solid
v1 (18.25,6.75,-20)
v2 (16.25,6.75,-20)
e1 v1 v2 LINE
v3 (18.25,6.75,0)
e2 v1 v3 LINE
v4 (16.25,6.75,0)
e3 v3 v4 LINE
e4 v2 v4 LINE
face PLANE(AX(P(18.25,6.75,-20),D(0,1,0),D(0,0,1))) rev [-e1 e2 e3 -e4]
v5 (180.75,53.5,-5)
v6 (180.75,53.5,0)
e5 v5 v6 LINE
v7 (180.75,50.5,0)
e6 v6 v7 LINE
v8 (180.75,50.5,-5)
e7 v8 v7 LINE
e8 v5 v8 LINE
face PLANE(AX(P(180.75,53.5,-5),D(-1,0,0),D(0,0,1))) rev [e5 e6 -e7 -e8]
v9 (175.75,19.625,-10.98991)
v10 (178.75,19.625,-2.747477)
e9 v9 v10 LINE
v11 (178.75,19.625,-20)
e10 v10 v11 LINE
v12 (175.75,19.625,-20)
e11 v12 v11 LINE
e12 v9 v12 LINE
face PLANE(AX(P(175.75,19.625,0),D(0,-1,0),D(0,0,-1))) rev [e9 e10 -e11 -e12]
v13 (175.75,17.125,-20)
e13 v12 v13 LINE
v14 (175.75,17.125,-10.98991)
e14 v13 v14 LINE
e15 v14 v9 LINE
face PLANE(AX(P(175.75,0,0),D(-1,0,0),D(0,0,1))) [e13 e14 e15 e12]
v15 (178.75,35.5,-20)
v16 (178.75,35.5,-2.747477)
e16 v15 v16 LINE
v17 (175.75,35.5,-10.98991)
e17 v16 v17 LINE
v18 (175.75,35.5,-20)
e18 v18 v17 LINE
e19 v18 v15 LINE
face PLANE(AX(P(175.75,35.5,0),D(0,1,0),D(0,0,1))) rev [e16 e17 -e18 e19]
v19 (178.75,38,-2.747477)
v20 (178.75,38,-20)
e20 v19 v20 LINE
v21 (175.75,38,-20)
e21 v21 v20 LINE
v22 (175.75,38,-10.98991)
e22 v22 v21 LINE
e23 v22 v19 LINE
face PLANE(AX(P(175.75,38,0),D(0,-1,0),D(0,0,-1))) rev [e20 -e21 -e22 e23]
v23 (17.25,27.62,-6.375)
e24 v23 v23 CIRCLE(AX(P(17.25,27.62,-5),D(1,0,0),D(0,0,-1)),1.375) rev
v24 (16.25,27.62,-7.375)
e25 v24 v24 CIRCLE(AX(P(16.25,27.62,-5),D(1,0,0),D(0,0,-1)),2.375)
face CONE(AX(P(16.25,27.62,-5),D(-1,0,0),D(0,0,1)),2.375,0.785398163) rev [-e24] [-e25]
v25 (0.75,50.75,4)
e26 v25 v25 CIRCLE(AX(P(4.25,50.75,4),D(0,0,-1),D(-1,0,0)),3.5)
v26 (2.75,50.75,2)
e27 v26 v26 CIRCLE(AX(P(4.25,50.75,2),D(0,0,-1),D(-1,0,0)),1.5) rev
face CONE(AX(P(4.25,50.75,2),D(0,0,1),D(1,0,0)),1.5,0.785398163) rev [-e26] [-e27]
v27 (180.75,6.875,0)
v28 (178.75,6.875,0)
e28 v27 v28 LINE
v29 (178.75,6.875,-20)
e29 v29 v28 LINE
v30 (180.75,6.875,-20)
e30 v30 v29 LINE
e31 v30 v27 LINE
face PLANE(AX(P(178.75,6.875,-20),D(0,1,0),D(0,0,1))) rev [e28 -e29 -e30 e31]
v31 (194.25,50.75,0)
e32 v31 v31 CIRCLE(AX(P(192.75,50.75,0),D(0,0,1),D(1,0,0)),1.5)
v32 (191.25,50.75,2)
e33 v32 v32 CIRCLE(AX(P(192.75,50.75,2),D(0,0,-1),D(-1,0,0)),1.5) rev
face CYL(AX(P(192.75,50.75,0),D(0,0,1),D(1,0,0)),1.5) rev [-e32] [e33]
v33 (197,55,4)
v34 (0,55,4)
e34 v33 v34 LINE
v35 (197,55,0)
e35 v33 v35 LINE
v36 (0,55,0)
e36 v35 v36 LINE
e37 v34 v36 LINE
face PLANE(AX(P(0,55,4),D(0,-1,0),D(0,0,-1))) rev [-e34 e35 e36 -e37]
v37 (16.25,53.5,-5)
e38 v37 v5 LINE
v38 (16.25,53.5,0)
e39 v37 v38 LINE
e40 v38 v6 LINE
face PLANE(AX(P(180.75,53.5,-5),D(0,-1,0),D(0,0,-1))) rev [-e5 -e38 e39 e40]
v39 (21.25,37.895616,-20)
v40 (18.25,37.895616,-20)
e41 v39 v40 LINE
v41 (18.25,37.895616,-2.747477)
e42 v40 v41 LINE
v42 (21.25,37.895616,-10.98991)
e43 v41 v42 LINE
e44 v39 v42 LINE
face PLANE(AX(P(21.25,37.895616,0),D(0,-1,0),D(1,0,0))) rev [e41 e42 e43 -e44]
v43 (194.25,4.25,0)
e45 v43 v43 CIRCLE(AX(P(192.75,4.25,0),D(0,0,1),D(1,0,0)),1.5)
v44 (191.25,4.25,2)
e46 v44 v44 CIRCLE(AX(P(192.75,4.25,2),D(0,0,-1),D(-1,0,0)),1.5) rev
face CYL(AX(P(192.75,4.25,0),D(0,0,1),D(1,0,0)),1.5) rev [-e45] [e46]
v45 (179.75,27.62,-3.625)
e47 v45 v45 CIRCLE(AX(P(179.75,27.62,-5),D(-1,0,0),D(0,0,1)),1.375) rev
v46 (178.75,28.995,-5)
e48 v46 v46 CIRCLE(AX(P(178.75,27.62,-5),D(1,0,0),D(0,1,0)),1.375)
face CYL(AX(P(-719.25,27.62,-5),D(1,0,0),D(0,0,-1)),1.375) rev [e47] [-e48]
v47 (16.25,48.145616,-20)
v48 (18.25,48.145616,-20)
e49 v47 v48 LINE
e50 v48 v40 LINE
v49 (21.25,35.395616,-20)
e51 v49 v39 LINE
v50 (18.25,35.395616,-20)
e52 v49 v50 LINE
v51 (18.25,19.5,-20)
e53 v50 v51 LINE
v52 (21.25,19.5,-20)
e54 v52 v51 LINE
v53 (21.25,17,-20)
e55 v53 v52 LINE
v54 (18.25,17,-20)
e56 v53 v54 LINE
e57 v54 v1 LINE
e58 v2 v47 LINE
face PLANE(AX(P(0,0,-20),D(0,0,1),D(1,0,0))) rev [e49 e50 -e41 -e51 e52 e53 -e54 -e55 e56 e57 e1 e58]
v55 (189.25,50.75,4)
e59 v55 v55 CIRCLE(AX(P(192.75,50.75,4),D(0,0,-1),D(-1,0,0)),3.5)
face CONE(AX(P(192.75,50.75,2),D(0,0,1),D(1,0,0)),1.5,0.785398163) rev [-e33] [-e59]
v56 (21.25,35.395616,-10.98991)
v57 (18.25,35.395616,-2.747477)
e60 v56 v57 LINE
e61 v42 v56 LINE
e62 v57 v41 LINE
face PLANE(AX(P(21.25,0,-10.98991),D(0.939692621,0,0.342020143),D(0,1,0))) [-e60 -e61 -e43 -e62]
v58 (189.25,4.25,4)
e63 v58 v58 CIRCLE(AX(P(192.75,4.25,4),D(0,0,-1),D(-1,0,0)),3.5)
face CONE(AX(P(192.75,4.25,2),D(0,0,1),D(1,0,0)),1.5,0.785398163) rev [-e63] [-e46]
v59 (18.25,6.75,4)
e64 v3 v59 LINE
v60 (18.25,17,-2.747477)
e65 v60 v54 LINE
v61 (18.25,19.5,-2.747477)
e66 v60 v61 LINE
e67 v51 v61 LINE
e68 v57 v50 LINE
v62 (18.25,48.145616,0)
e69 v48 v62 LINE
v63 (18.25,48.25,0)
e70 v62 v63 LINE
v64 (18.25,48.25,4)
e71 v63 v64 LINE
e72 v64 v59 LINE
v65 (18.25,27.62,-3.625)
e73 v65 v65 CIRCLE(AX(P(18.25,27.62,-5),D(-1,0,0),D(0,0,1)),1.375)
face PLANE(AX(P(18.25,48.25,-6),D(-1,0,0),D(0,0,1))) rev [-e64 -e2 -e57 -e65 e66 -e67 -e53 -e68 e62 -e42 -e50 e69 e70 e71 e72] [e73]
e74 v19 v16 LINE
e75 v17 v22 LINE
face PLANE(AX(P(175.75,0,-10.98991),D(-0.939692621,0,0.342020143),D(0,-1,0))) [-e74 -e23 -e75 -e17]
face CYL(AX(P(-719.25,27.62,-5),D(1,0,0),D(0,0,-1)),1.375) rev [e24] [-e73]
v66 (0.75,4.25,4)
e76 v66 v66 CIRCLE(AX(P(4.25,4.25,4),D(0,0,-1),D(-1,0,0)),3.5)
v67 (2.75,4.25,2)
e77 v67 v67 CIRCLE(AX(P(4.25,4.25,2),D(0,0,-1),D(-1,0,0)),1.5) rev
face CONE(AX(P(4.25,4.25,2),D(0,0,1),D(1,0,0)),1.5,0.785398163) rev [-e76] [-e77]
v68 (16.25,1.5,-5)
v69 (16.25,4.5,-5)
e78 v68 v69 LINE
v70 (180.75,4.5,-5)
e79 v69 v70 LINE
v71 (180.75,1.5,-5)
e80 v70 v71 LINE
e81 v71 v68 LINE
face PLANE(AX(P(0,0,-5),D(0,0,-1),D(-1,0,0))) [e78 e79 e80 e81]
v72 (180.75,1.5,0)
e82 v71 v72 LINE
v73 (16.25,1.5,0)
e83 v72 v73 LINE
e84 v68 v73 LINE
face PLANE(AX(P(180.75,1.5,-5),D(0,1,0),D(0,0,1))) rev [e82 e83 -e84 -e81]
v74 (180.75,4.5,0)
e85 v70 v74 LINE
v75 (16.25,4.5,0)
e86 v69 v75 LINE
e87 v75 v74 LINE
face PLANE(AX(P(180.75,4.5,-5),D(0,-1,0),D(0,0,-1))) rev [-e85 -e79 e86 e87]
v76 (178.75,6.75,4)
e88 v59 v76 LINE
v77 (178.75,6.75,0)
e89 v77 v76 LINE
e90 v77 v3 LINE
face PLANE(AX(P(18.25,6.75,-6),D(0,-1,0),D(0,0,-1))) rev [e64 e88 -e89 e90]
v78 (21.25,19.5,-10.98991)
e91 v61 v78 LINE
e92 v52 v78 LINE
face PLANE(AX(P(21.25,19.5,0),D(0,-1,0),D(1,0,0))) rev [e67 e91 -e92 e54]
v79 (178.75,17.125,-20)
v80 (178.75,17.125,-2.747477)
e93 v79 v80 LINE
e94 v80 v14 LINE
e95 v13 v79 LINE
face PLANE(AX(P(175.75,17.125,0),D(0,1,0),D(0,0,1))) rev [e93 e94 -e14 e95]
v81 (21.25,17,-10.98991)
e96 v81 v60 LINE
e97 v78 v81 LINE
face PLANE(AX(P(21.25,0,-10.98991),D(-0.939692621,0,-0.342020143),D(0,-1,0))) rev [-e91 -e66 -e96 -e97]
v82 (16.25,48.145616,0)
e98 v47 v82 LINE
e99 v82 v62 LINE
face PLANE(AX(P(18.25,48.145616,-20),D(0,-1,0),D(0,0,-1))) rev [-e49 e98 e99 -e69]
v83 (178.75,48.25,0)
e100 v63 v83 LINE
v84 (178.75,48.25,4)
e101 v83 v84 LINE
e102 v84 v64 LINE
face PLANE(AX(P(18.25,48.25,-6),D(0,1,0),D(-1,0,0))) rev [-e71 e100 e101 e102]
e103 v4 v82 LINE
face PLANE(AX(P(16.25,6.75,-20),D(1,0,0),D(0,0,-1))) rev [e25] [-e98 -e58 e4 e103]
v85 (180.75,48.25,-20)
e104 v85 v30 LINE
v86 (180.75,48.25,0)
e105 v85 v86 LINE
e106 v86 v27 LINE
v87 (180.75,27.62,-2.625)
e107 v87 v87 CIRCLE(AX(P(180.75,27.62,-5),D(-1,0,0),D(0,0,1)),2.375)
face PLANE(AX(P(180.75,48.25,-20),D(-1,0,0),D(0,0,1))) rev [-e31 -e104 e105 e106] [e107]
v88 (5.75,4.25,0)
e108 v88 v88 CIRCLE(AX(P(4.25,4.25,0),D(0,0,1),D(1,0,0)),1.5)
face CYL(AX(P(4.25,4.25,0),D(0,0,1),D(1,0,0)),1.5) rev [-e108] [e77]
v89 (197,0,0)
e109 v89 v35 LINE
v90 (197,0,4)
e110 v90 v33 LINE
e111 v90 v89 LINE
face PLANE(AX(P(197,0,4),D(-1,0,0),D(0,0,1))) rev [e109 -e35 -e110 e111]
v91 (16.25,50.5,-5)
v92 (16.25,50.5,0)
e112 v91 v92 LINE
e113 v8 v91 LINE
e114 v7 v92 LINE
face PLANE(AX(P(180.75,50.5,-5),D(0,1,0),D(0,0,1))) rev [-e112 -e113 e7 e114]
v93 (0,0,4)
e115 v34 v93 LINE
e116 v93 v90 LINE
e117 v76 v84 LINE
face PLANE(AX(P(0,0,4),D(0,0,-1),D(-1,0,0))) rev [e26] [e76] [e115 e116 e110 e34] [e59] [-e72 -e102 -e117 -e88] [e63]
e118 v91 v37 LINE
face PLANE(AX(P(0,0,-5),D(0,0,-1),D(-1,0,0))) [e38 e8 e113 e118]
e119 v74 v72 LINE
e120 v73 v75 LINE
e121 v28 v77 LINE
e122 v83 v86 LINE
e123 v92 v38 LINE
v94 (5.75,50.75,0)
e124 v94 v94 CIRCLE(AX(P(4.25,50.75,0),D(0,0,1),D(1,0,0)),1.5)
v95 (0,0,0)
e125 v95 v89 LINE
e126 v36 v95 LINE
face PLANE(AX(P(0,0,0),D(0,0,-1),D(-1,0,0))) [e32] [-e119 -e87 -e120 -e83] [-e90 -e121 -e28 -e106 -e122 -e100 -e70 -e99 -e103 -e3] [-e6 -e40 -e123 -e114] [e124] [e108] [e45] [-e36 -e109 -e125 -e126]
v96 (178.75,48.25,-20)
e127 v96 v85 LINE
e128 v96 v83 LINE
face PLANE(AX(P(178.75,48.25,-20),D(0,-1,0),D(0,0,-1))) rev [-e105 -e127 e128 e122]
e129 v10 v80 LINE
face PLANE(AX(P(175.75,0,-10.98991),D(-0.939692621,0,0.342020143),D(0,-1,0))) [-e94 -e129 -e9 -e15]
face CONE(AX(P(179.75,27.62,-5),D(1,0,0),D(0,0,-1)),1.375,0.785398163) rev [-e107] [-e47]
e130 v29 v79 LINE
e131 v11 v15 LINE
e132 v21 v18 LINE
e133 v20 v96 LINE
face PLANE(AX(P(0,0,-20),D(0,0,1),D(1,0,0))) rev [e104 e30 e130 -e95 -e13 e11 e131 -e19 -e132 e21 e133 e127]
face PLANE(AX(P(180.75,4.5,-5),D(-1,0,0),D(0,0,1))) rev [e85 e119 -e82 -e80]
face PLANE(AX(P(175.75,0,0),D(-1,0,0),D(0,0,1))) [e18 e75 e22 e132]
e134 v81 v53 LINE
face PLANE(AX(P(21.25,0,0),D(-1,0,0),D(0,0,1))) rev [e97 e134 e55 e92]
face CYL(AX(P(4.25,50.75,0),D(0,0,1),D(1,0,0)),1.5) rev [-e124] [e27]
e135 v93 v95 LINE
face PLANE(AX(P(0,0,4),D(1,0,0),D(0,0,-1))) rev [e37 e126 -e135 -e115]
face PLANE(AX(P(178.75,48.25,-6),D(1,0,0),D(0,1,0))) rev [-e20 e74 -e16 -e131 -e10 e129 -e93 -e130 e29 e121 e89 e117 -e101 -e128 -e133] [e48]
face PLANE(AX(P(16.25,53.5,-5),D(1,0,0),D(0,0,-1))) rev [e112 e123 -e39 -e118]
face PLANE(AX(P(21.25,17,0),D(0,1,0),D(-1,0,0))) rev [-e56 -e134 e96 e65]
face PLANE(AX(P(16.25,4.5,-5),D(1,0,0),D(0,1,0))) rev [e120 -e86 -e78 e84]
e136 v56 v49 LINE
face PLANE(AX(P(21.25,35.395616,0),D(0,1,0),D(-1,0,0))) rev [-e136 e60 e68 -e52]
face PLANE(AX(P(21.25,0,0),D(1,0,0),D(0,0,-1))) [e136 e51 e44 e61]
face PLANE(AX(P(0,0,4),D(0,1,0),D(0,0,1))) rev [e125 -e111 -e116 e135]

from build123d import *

# Parameters (mm, degrees)
ESQUISSE1_W             = 197
ESQUISSE1_H             = 55
BOSS_EXTRU_1_DEPTH      = 4
ESQUISSE3_R             = 1.5
ENL_V_MAT_EXTRU_2_DEPTH = 4
CHANFREIN1_SIZE         = 2
ESQUISSE4_W             = 160.5
ESQUISSE4_H             = 41.5
ENL_V_MAT_EXTRU_3_DEPTH = 10
ESQUISSE5_W             = 2
ESQUISSE5_H             = 41.395615901
ESQUISSE5_H_2           = 41.375
BOSS_EXTRU_2_DEPTH      = 20
ESQUISSE6_W             = 20
ESQUISSE6_H             = 2.5
BOSS_EXTRU_3_DEPTH      = 3
ESQUISSE7_W             = 20
ESQUISSE7_H             = 2.5
BOSS_EXTRU_4_DEPTH      = 3
CHANFREIN3_SIZE         = 4
CHANFREIN3_SIZE_2       = 10.989909678
ESQUISSE8_R             = 1.375
ENL_V_MAT_EXTRU_4_DEPTH = 900
CHANFREIN4_SIZE         = 1
ESQUISSE9_W             = 164.5
ESQUISSE9_H             = 3
BOSS_EXTRU_5_DEPTH      = 5


with BuildPart() as part:
    # Esquisse1 → Boss.-Extru.1 (new body)
    with BuildSketch(Plane.XY):
        with Locations((98.5, 27.5)):
            Rectangle(ESQUISSE1_W, ESQUISSE1_H)
    extrude(amount=BOSS_EXTRU_1_DEPTH)

    # Esquisse3 → Enlèv. mat.-Extru.2 (cut)
    with BuildSketch(Plane.XY.offset(4)):
        with Locations((4.25, 50.75)):
            Circle(ESQUISSE3_R)
        with Locations((4.25, 4.25)):
            Circle(ESQUISSE3_R)
        with Locations((192.75, 4.25)):
            Circle(ESQUISSE3_R)
        with Locations((192.75, 50.75)):
            Circle(ESQUISSE3_R)
    extrude(amount=-ENL_V_MAT_EXTRU_2_DEPTH, mode=Mode.SUBTRACT)

    # Chanfrein1
    chanfrein1_edges = [part.edges().sort_by_distance(p)[0] for p in [
        (2.75, 50.75, 4),
        (2.75, 4.25, 4),
        (191.25, 4.25, 4),
        (191.25, 50.75, 4),
    ]]
    chamfer(chanfrein1_edges, length=CHANFREIN1_SIZE)

    # Esquisse4 → Enlèv. mat.-Extru.3 (cut)
    with BuildSketch(Plane.XY.offset(4)):
        with Locations((98.5, 27.5)):
            Rectangle(ESQUISSE4_W, ESQUISSE4_H)
    extrude(amount=-ENL_V_MAT_EXTRU_3_DEPTH, mode=Mode.SUBTRACT)

    # Esquisse5 → Boss.-Extru.2 (add)
    with BuildSketch(Plane(origin=(0, 0, 0), x_dir=(-1, 0, 0), z_dir=(0, 0, -1))):
        with Locations((-17.25, 27.447807951)):
            Rectangle(ESQUISSE5_W, ESQUISSE5_H)
        with Locations((-179.75, 27.5625)):
            Rectangle(ESQUISSE5_W, ESQUISSE5_H_2)
    extrude(amount=BOSS_EXTRU_2_DEPTH)

    # Esquisse6 → Boss.-Extru.3 (add)
    with BuildSketch(Plane.ZY.offset(-178.75)):
        with Locations((-10, 18.375)):
            Rectangle(ESQUISSE6_W, ESQUISSE6_H)
        with Locations((-10, 36.75)):
            Rectangle(ESQUISSE6_W, ESQUISSE6_H)
    extrude(amount=BOSS_EXTRU_3_DEPTH)

    # Esquisse7 → Boss.-Extru.4 (add)
    with BuildSketch(Plane(origin=(18.25, 0, 0), x_dir=(0, 0, -1), z_dir=(1, 0, 0))):
        with Locations((10, 18.25)):
            Rectangle(ESQUISSE7_W, ESQUISSE7_H)
        with Locations((10, 36.645615901)):
            Rectangle(ESQUISSE7_W, ESQUISSE7_H)
    extrude(amount=BOSS_EXTRU_4_DEPTH)

    # Chanfrein3
    # the kernel refuses this chamfer: 10.989909678, 4 mm, written as the material it takes off along each edge
    with BuildSketch(Plane(origin=(21.25, 48.009965797, 0), x_dir=(-0.9950833631817486, 0, 0.0990409022520506), z_dir=(0, -1, 0))) as chanfrein3_piece_1_section:
        Polygon((CHANFREIN3_SIZE * 0.995083363182, CHANFREIN3_SIZE * 0.0990409022521), (-CHANFREIN3_SIZE_2 * 0.0990409022504, CHANFREIN3_SIZE_2 * 0.995083363165), (0, 0), align=None)
    chanfrein3_piece_1 = extrude(amount=59.519931595, mode=Mode.PRIVATE)
    chanfrein3_piece_1 = split(chanfrein3_piece_1, bisect_by=Plane(origin=(18.25, 18.25, -4.010147901), z_dir=(1, 0, 0)), keep=Keep.TOP, mode=Mode.PRIVATE)
    add(chanfrein3_piece_1, mode=Mode.SUBTRACT)
    with BuildSketch(Plane(origin=(21.25, 6.885650104, 0), x_dir=(-0.9950833631817486, 0, 0.0990409022520506), z_dir=(0, 1, 0))) as chanfrein3_piece_2_section:
        Polygon((CHANFREIN3_SIZE * 0.995083363182, -CHANFREIN3_SIZE * 0.0990409022521), (-CHANFREIN3_SIZE_2 * 0.0990409022504, -CHANFREIN3_SIZE_2 * 0.995083363165), (0, 0), align=None)
    chanfrein3_piece_2 = extrude(amount=59.519931595, mode=Mode.PRIVATE)
    chanfrein3_piece_2 = split(chanfrein3_piece_2, bisect_by=Plane(origin=(18.25, 36.645615901, -4.010147901), z_dir=(1, 0, 0)), keep=Keep.TOP, mode=Mode.PRIVATE)
    add(chanfrein3_piece_2, mode=Mode.SUBTRACT)
    with BuildSketch(Plane(origin=(175.75, 66.509965797, 0), x_dir=(0.9950833631817486, 0, 0.09904090225205044), z_dir=(0, -1, 0))) as chanfrein3_piece_3_section:
        Polygon((CHANFREIN3_SIZE * 0.995083363182, -CHANFREIN3_SIZE * 0.0990409022521), (-CHANFREIN3_SIZE_2 * 0.0990409022504, -CHANFREIN3_SIZE_2 * 0.995083363165), (0, 0), align=None)
    chanfrein3_piece_3 = extrude(amount=59.519931595, mode=Mode.PRIVATE)
    chanfrein3_piece_3 = split(chanfrein3_piece_3, bisect_by=Plane(origin=(178.75, 36.75, -4.010147901), z_dir=(-1, 0, 0)), keep=Keep.TOP, mode=Mode.PRIVATE)
    add(chanfrein3_piece_3, mode=Mode.SUBTRACT)
    with BuildSketch(Plane(origin=(175.75, 48.134965797, 0), x_dir=(0.9950833631817486, 0, 0.09904090225205044), z_dir=(0, -1, 0))) as chanfrein3_piece_4_section:
        Polygon((CHANFREIN3_SIZE * 0.995083363182, -CHANFREIN3_SIZE * 0.0990409022521), (-CHANFREIN3_SIZE_2 * 0.0990409022504, -CHANFREIN3_SIZE_2 * 0.995083363165), (0, 0), align=None)
    chanfrein3_piece_4 = extrude(amount=59.519931595, mode=Mode.PRIVATE)
    chanfrein3_piece_4 = split(chanfrein3_piece_4, bisect_by=Plane(origin=(178.75, 18.375, -4.010147901), z_dir=(-1, 0, 0)), keep=Keep.TOP, mode=Mode.PRIVATE)
    add(chanfrein3_piece_4, mode=Mode.SUBTRACT)

    # Esquisse8 → Enlèv. mat.-Extru.4 (cut)
    with BuildSketch(Plane(origin=(180.75, 0, 0), x_dir=(0, 0, -1), z_dir=(1, 0, 0))):
        with Locations((5, 27.62)):
            Circle(ESQUISSE8_R)
    extrude(amount=-ENL_V_MAT_EXTRU_4_DEPTH, mode=Mode.SUBTRACT)

    # Chanfrein4
    chanfrein4_edges = [part.edges().sort_by_distance(p)[0] for p in [
        (16.25, 27.62, -3.625),
        (180.75, 27.62, -3.625),
    ]]
    chamfer(chanfrein4_edges, length=CHANFREIN4_SIZE)

    # Esquisse9 → Boss.-Extru.5 (add)
    with BuildSketch(Plane(origin=(0, 0, 0), x_dir=(-1, 0, 0), z_dir=(0, 0, -1))):
        with Locations((-98.5, 52)):
            Rectangle(ESQUISSE9_W, ESQUISSE9_H)
        with Locations((-98.5, 3)):
            Rectangle(ESQUISSE9_W, ESQUISSE9_H)
    extrude(amount=BOSS_EXTRU_5_DEPTH)


solid = part.part
